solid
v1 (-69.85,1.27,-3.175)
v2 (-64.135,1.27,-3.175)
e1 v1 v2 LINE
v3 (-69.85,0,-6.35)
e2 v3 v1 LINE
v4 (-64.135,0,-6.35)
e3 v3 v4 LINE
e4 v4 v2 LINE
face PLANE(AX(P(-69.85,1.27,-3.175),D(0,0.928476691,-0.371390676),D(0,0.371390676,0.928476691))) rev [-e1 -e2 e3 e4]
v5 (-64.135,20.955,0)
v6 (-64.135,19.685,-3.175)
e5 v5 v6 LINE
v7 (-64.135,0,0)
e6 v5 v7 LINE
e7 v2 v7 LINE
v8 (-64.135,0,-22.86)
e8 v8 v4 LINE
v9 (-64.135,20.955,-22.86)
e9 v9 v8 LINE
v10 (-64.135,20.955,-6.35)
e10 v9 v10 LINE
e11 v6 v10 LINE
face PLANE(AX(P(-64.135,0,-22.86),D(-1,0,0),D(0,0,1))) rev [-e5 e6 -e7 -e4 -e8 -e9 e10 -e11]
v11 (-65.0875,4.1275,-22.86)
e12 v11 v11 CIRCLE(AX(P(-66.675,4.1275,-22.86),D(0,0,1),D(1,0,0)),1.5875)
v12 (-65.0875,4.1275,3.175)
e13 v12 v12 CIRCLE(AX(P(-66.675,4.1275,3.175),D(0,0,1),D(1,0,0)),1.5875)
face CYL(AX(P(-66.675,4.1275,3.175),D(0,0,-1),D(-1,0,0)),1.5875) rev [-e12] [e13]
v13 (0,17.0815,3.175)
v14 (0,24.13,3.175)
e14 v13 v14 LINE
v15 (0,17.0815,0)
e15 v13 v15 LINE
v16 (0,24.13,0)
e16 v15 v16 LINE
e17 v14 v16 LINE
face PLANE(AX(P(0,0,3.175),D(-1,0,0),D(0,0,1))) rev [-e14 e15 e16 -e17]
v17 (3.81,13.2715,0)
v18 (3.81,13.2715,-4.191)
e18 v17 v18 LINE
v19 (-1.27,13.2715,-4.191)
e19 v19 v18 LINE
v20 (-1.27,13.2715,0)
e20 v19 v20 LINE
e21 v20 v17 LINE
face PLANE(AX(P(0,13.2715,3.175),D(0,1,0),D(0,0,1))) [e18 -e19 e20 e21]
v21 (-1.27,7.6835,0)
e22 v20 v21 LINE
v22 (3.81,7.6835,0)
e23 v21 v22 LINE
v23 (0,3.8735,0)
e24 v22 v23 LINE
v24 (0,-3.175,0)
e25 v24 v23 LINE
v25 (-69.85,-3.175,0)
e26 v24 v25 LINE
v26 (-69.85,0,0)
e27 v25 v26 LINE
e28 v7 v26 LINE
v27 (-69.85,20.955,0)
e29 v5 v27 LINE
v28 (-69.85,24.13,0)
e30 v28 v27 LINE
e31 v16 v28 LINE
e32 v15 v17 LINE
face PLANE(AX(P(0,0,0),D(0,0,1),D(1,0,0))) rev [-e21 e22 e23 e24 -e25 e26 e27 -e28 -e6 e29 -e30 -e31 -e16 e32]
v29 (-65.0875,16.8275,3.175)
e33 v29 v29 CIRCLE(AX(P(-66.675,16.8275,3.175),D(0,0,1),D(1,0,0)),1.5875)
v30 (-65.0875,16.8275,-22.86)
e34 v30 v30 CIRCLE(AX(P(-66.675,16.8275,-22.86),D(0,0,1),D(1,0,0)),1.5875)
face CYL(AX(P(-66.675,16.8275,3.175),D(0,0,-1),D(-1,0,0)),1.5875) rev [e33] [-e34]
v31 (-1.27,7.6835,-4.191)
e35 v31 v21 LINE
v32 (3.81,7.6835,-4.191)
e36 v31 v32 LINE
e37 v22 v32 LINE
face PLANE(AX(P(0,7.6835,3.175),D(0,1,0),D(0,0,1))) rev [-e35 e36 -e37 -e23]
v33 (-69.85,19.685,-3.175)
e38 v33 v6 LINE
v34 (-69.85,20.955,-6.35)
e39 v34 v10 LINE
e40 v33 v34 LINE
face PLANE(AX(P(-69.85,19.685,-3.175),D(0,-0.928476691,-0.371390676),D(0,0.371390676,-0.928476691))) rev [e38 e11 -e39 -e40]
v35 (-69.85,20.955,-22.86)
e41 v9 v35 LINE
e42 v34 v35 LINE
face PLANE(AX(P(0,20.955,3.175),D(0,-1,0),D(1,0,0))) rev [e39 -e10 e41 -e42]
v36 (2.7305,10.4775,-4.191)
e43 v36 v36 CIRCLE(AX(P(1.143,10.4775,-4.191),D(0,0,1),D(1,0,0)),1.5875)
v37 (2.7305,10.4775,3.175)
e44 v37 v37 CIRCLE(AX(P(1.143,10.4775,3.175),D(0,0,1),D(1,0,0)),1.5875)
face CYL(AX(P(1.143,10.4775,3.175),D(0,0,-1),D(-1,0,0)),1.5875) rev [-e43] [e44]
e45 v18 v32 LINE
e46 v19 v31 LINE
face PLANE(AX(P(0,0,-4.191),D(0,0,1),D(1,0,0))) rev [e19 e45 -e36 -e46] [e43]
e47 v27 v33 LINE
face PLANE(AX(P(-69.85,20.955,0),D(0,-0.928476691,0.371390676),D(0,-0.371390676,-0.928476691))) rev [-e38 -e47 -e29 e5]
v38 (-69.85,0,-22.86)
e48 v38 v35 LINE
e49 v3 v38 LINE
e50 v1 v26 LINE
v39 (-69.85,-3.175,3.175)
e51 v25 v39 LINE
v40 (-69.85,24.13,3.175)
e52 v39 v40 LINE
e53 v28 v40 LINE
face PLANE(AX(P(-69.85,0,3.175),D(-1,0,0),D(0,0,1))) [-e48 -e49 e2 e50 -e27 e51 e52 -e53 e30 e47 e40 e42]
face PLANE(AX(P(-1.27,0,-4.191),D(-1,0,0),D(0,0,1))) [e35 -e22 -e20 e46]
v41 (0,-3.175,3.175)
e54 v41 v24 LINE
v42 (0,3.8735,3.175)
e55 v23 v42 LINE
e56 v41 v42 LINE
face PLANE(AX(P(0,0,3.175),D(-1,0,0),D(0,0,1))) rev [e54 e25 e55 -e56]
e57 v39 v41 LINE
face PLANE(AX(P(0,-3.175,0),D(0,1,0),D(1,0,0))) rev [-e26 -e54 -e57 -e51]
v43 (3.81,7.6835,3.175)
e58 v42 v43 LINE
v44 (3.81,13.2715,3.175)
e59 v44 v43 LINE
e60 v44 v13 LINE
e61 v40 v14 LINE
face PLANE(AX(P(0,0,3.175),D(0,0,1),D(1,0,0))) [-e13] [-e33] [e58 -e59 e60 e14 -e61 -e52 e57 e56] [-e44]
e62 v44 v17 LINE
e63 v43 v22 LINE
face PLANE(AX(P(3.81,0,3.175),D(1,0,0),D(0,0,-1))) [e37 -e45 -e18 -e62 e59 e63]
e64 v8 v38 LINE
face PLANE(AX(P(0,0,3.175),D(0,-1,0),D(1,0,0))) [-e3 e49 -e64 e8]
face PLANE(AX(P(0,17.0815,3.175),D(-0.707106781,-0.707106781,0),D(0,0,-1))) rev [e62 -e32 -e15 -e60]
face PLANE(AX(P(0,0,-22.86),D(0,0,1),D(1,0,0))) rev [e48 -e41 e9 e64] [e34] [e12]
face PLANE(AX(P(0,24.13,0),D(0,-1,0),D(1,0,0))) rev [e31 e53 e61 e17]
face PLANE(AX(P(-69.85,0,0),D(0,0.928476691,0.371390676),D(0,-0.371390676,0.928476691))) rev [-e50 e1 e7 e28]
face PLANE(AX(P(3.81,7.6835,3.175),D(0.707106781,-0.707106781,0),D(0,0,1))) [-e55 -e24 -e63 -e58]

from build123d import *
from build123d.topology import SkipClean

# Parameters (mm, degrees)
SKETCH1_R           = 1.5875
BOSS_EXTRUDE1_DEPTH = 3.175
BOSS_EXTRUDE2_START = -22.86
SKETCH1_3_W         = 5.715
SKETCH1_3_H         = 20.955
SKETCH1_3_R         = 1.5875
BOSS_EXTRUDE2_DEPTH = 22.86
BOSS_EXTRUDE3_START = -4.191
BOSS_EXTRUDE3_DEPTH = 4.191
CHAMFER1_SIZE       = 3.81
SKETCH3_W           = 69.85
SKETCH3_H           = 3.175
BOSS_EXTRUDE4_DEPTH = 3.175
CUT_EXTRUDE6_DEPTH  = 76.639668991


with BuildPart() as part:
    # Sketch1 → Boss-Extrude1 (new body)
    with BuildSketch(Plane.XY):
        Polygon((0, 20.955), (-69.85, 20.955), (-69.85, 0), (0, 0), (0, 7.6835), (3.81, 7.6835), (3.81, 13.2715), (0, 13.2715), align=None)
        with Locations((-66.675, 16.8275)):
            Circle(SKETCH1_R, mode=Mode.SUBTRACT)
        with Locations((-66.675, 4.1275)):
            Circle(SKETCH1_R, mode=Mode.SUBTRACT)
        with Locations((1.143, 10.4775)):
            Circle(SKETCH1_R, mode=Mode.SUBTRACT)
    extrude(amount=BOSS_EXTRUDE1_DEPTH)

    # Sketch1<3> → Boss-Extrude2 (add)
    with BuildSketch(Plane.XY.offset(BOSS_EXTRUDE2_START)):
        with Locations((-66.9925, 10.4775)):
            Rectangle(SKETCH1_3_W, SKETCH1_3_H)
        with Locations((-66.675, 4.1275)):
            Circle(SKETCH1_3_R, mode=Mode.SUBTRACT)
        with Locations((-66.675, 16.8275)):
            Circle(SKETCH1_3_R, mode=Mode.SUBTRACT)
    extrude(amount=BOSS_EXTRUDE2_DEPTH)

    # Sketch1<4> → Boss-Extrude3 (add)
    with SkipClean():  # the faces are left unmerged after this step: merging them gives an invalid solid
        with BuildSketch(Plane.XY.offset(BOSS_EXTRUDE3_START)):
            with BuildLine():
                Line((3.81, 13.2715), (0, 13.2715))
                Line((0, 13.2715), (0, 11.579183825))
                ThreePointArc((0, 11.579183825), (1.73698811, 11.949686936), (2.7305, 10.4775))
                ThreePointArc((2.7305, 10.4775), (1.73698811, 9.005313064), (0, 9.375816175))
                Line((0, 9.375816175), (0, 7.6835))
                Line((0, 7.6835), (3.81, 7.6835))
                Line((3.81, 7.6835), (3.81, 13.2715))
            make_face()
            with BuildLine():
                Line((0, 11.579183825), (0, 13.2715))
                Line((0, 13.2715), (-1.27, 13.2715))
                Line((-1.27, 13.2715), (-1.27, 7.6835))
                Line((-1.27, 7.6835), (0, 7.6835))
                Line((0, 7.6835), (0, 9.375816175))
                ThreePointArc((0, 9.375816175), (-0.4445, 10.4775), (0, 11.579183825))
            make_face()
        extrude(amount=BOSS_EXTRUDE3_DEPTH)

    # Chamfer1
    # the kernel refuses this chamfer: 3.81 mm, written as the material it adds along each edge
    with BuildSketch(Plane(origin=(0, 7.6835, 0), x_dir=(-0.027495876610586462, -0.9996219169112968, 0), z_dir=(0, 0, 1))) as chamfer1_piece_1_section:
        Polygon((CHAMFER1_SIZE * 0.999621916911, CHAMFER1_SIZE * 0.0274958766106), (-CHAMFER1_SIZE * 0.0274958766106, CHAMFER1_SIZE * 0.999621916911), (0, 0), align=None)
    chamfer1_piece_1 = extrude(amount=3.175, mode=Mode.PRIVATE)
    chamfer1_piece_1 = split(chamfer1_piece_1, bisect_by=Plane(origin=(3.81, 6.424660172, 1.5875), z_dir=(-1, 0, 0)), keep=Keep.TOP, mode=Mode.PRIVATE)
    add(chamfer1_piece_1)
    with BuildSketch(Plane(origin=(0, 13.2715, 0), x_dir=(-0.027495876610586452, 0.9996219169112968, 0), z_dir=(0, 0, 1))) as chamfer1_piece_2_section:
        Polygon((CHAMFER1_SIZE * 0.999621916911, -CHAMFER1_SIZE * 0.0274958766106), (-CHAMFER1_SIZE * 0.0274958766106, -CHAMFER1_SIZE * 0.999621916911), (0, 0), align=None)
    chamfer1_piece_2 = extrude(amount=3.175, mode=Mode.PRIVATE)
    chamfer1_piece_2 = split(chamfer1_piece_2, bisect_by=Plane(origin=(3.81, 14.530339828, 1.5875), z_dir=(-1, 0, 0)), keep=Keep.TOP, mode=Mode.PRIVATE)
    add(chamfer1_piece_2)

    # Sketch3 → Boss-Extrude4 (add)
    with BuildSketch(Plane(origin=(0, 20.955, 0), x_dir=(1, 0, 0), z_dir=(0, 1, 0))):
        with Locations((-34.925, -1.5875)):
            Rectangle(SKETCH3_W, SKETCH3_H)
    boss_extrude4 = extrude(amount=BOSS_EXTRUDE4_DEPTH)

    # Mirror1: Boss-Extrude4 across plane
    add(boss_extrude4.mirror(Plane(origin=(0, 10.4775, 0), x_dir=(0, 0, 1), z_dir=(0, -1, 0))))

    # Sketch6 → Cut-Extrude6 (cut, through all)
    with BuildSketch(Plane(origin=(-64.135, 0, 0), x_dir=(0, 0, -1), z_dir=(1, 0, 0))):
        Polygon((0, 20.955), (3.175, 19.685), (6.35, 20.955), align=None)
        Polygon((3.175, 1.27), (6.35, 0), (0, 0), align=None)
    extrude(amount=-CUT_EXTRUDE6_DEPTH, mode=Mode.SUBTRACT)


solid = part.part
